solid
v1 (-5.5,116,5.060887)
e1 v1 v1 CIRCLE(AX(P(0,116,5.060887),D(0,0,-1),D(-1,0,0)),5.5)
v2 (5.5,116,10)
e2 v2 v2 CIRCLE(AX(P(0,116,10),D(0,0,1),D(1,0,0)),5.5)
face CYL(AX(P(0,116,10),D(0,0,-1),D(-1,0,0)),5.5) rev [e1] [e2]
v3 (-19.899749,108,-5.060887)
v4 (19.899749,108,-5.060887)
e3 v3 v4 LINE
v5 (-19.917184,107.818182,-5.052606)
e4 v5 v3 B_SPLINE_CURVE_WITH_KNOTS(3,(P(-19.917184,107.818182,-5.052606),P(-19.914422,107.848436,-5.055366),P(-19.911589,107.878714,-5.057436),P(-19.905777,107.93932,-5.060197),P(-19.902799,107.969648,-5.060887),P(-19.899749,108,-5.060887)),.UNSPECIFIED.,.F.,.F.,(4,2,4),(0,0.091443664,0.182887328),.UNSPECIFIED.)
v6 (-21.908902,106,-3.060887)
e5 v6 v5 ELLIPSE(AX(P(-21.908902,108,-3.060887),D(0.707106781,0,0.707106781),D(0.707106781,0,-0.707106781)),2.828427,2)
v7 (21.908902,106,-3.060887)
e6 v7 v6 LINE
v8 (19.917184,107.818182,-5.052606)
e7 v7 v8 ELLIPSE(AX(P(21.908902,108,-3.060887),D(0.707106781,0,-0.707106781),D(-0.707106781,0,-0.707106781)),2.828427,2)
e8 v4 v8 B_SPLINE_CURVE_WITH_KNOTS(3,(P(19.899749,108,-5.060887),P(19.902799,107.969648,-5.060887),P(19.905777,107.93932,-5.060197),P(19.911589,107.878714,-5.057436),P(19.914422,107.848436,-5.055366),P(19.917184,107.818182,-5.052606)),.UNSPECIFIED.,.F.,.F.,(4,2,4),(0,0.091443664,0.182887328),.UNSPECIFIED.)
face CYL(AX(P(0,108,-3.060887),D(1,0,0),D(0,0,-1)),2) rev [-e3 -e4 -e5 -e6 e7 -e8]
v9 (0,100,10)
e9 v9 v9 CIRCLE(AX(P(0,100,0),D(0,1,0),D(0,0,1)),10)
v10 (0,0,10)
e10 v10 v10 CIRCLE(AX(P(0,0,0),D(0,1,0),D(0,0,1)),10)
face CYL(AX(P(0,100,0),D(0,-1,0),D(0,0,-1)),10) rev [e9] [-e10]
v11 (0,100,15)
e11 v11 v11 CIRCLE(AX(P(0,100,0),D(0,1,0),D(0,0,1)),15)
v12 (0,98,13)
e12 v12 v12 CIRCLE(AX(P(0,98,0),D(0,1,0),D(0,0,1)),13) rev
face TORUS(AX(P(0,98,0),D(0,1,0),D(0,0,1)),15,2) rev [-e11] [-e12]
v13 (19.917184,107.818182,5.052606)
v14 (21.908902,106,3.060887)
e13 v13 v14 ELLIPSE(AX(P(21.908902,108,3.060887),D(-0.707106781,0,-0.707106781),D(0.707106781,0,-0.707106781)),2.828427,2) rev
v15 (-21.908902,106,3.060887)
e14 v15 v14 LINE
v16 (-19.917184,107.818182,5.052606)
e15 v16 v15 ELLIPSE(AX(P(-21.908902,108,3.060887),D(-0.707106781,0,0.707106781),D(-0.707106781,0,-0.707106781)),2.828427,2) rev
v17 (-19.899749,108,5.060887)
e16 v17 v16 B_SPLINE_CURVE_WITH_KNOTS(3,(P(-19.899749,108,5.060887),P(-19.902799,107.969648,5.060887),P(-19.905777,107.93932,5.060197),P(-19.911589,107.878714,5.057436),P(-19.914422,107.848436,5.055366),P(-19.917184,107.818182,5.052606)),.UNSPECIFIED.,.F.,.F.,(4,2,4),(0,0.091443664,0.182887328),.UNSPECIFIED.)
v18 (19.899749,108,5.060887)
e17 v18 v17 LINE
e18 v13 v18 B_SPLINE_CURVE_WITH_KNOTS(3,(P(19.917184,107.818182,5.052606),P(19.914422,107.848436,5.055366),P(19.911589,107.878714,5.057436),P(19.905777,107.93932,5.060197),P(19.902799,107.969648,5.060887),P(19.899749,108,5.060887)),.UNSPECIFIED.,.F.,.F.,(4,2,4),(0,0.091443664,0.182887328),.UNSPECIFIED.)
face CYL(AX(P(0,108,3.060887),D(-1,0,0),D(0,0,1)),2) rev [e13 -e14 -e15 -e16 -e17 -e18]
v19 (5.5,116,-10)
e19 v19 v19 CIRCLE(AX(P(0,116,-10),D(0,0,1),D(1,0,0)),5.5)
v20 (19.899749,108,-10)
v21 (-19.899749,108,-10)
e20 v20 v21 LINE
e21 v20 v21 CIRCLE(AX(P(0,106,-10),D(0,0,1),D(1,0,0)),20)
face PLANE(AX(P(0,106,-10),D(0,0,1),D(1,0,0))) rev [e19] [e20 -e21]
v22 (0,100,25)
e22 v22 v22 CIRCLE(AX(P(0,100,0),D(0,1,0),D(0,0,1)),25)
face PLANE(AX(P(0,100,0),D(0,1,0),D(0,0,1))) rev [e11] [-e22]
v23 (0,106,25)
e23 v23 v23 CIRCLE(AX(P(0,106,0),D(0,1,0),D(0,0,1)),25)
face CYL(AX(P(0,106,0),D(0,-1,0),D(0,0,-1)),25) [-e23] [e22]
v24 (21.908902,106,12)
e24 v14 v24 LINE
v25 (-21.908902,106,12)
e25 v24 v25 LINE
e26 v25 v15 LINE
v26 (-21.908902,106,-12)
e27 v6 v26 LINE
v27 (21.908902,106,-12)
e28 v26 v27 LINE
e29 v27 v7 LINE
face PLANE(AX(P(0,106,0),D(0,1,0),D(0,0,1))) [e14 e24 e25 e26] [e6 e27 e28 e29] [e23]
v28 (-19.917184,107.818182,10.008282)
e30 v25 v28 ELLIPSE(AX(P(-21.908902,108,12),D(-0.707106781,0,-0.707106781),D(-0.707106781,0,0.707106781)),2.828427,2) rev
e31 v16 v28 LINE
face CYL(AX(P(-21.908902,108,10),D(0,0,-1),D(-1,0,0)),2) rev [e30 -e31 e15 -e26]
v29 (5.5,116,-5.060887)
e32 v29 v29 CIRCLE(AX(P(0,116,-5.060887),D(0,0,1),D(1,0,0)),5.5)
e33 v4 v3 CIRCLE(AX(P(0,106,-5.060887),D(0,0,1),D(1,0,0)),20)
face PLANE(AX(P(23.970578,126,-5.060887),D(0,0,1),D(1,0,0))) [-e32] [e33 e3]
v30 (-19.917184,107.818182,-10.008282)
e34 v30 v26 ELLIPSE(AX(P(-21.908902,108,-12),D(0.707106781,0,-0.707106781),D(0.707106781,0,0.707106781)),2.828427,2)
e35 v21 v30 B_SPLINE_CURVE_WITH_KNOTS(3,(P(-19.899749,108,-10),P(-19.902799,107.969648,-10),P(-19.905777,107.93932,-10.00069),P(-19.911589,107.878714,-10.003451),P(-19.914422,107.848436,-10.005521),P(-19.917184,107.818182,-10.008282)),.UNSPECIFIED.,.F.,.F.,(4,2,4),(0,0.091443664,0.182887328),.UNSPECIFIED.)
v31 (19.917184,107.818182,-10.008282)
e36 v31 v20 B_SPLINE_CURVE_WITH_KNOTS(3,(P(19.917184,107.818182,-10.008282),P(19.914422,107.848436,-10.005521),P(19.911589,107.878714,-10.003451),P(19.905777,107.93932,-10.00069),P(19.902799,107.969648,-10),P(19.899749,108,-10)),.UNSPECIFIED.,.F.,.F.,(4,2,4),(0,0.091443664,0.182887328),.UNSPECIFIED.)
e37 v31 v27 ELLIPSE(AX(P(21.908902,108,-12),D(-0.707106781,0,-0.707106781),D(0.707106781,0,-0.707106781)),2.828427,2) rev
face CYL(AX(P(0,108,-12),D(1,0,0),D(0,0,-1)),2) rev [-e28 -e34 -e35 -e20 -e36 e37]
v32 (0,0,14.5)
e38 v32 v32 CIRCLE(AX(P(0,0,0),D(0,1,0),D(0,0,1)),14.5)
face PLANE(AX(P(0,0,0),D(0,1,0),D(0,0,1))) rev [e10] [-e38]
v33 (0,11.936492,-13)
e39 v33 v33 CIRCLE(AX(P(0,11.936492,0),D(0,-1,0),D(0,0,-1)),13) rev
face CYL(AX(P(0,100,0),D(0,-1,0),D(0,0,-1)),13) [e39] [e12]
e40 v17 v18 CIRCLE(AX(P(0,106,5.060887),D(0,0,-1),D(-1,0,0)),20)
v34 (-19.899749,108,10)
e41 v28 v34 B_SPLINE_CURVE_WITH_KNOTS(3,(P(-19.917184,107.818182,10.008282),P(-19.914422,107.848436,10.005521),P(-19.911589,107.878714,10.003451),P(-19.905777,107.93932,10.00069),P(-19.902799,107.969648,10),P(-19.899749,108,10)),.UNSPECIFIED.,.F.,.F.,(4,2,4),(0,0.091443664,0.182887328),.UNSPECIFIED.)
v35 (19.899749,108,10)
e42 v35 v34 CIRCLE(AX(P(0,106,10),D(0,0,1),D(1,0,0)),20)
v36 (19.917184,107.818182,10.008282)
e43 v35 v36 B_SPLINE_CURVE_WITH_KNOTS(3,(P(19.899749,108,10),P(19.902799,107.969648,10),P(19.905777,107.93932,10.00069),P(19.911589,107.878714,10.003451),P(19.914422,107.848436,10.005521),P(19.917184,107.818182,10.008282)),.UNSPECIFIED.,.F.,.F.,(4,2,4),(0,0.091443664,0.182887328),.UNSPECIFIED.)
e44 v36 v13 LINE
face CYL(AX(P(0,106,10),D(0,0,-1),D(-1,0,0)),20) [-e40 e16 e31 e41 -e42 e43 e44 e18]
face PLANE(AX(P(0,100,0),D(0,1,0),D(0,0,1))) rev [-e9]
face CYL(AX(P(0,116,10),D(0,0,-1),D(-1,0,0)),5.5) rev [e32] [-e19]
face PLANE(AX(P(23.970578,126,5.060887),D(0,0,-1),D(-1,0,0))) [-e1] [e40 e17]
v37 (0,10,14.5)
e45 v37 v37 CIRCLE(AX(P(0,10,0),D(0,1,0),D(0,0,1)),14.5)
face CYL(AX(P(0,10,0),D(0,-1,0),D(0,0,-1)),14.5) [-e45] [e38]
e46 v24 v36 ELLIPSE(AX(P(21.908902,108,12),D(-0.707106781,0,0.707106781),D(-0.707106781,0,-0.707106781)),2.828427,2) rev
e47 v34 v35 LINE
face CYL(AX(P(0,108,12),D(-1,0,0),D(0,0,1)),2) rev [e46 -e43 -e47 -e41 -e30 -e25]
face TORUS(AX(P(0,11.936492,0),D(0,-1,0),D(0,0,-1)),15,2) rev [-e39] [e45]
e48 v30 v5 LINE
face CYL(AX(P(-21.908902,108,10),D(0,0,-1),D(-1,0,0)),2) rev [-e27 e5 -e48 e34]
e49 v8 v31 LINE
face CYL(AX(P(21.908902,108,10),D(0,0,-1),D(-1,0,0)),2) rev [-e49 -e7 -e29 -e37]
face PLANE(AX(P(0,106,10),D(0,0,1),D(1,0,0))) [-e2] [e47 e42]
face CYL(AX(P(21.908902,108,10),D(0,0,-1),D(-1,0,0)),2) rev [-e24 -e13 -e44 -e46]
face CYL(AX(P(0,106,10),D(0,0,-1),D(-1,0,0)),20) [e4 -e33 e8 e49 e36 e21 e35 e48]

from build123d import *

# Parameters (mm, degrees)
SKETCH2_R            = 13
SKETCH2_R_2          = 10
BOSS_EXTRUDE3_DEPTH  = 100
SKETCH2_3_R          = 14.5
SKETCH2_3_R_2        = 13
BOSS_EXTRUDE5_DEPTH  = 10
SKETCH8_R            = 25
BOSS_EXTRUDE7_DEPTH  = 6
SKETCH11_R           = 5.5
BOSS_EXTRUDE12_DEPTH = 10
SKETCH14_W           = 47.941155358
SKETCH14_H           = 10.12177459
CUT_EXTRUDE2_DEPTH   = 112.740771431
FILLET1_START        = -12.0000001
FILLET1_2_DEPTH      = 2.0000001
FILLET1_START_2      = 3.060887195
FILLET1_3_DEPTH      = 2.0000001
FILLET1_START_3      = -5.060887295
FILLET1_4_DEPTH      = 2
FILLET1_START_4      = 10
FILLET1_5_DEPTH      = 2
FILLET1_START_5      = -10
FILLET1_6_DEPTH      = 4.939112705
FILLET1_START_6      = 5.060887295
FILLET1_7_DEPTH      = 4.939112705
FILLET1_START_7      = -21.9089024
FILLET1_8_DEPTH      = 43.8178047


with BuildPart() as part:
    # Sketch2 → Boss-Extrude3 (new body)
    with BuildSketch(Plane(origin=(0, 0, 0), x_dir=(1, 0, 0), z_dir=(0, 1, 0))):
        with Locations(Location((0, 0, 0), (0, 0, 270))):
            Circle(SKETCH2_R)
        with Locations(Location((0, 0, 0), (0, 0, 270))):
            Circle(SKETCH2_R_2, mode=Mode.SUBTRACT)
    extrude(amount=BOSS_EXTRUDE3_DEPTH)

    # Sketch2<3> → Boss-Extrude5 (add)
    with BuildSketch(Plane(origin=(0, 0, 0), x_dir=(1, 0, 0), z_dir=(0, 1, 0))):
        with Locations(Location((0, 0, 0), (0, 0, 270))):
            Circle(SKETCH2_3_R)
        with Locations(Location((0, 0, 0), (0, 0, 270))):
            Circle(SKETCH2_3_R_2, mode=Mode.SUBTRACT)
    extrude(amount=BOSS_EXTRUDE5_DEPTH)

    # Sketch8 → Boss-Extrude7 (add)
    with BuildSketch(Plane(origin=(0, 100, 0), x_dir=(1, 0, 0), z_dir=(0, 1, 0))):
        with Locations(Location((0, 0, 0), (0, 0, 270))):
            Circle(SKETCH8_R)
    extrude(amount=BOSS_EXTRUDE7_DEPTH)

    # Sketch11 → Boss-Extrude12 (add, symmetric)
    with BuildSketch(Plane.XY):
        with BuildLine():
            Line((20, 106), (-20, 106))
            ThreePointArc((-20, 106), (0, 126), (20, 106))
        make_face()
        with Locations((0, 116)):
            Circle(SKETCH11_R, mode=Mode.SUBTRACT)
    extrude(amount=BOSS_EXTRUDE12_DEPTH, both=True)

    # Sketch14 → Cut-Extrude2 (cut, through all)
    with BuildSketch(Plane(origin=(0, 106, 0), x_dir=(1, 0, 0), z_dir=(0, 1, 0))):
        Rectangle(SKETCH14_W, SKETCH14_H)
    extrude(amount=CUT_EXTRUDE2_DEPTH, mode=Mode.SUBTRACT)

    # Fillet1: read off the stored shape, not the designer's step
    # Fillet1 outline → Fillet1 (revolve)
    with BuildSketch(Plane.XY):
        with BuildLine():
            Line((15, 100), (13, 100))
            Line((13, 100), (13, 98))
            ThreePointArc((13, 98), (13.585786438, 99.414213562), (15, 100))
        make_face()
        with BuildLine():
            ThreePointArc((14.5, 10), (13.41886117, 10.711746802), (13, 11.936491673))
            Line((13, 11.936491673), (13, 10))
            Line((13, 10), (14.5, 10))
        make_face()
    revolve(axis=Axis((0, 0, 0), (0, 1, 0)))

    # Fillet1 2 outline → Fillet1 2 (add)
    with BuildSketch(Plane.XY.offset(FILLET1_START)):
        with BuildLine():
            ThreePointArc((21.9089023, 106), (20.560502575, 106.522902108), (19.917183909, 107.818181818))
            ThreePointArc((19.917183909, 107.818181818), (0, 126), (-19.917183909, 107.818181818))
            ThreePointArc((-19.917183909, 107.818181818), (-20.560502575, 106.522902108), (-21.9089023, 106))
            Line((-21.9089023, 106), (21.9089023, 106))
        make_face()
    extrude(amount=FILLET1_2_DEPTH)

    # Fillet1 3 outline → Fillet1 3 (add)
    with BuildSketch(Plane.XY.offset(FILLET1_START_2)):
        with BuildLine():
            ThreePointArc((21.9089023, 106), (20.560502575, 106.522902108), (19.917183909, 107.818181818))
            ThreePointArc((19.917183909, 107.818181818), (0, 126), (-19.917183909, 107.818181818))
            ThreePointArc((-19.917183909, 107.818181818), (-20.560502575, 106.522902108), (-21.9089023, 106))
            Line((-21.9089023, 106), (21.9089023, 106))
        make_face()
    extrude(amount=FILLET1_3_DEPTH)

    # Fillet1 4 outline → Fillet1 4 (add)
    with BuildSketch(Plane.XY.offset(FILLET1_START_3)):
        with BuildLine():
            ThreePointArc((21.9089023, 106), (20.560502575, 106.522902108), (19.917183909, 107.818181818))
            ThreePointArc((19.917183909, 107.818181818), (0, 126), (-19.917183909, 107.818181818))
            ThreePointArc((-19.917183909, 107.818181818), (-20.560502575, 106.522902108), (-21.9089023, 106))
            Line((-21.9089023, 106), (21.9089023, 106))
        make_face()
    extrude(amount=FILLET1_4_DEPTH)

    # Fillet1 5 outline → Fillet1 5 (add)
    with BuildSketch(Plane.XY.offset(FILLET1_START_4)):
        with BuildLine():
            ThreePointArc((21.9089023, 106), (20.560502575, 106.522902108), (19.917183909, 107.818181818))
            ThreePointArc((19.917183909, 107.818181818), (0, 126), (-19.917183909, 107.818181818))
            ThreePointArc((-19.917183909, 107.818181818), (-20.560502575, 106.522902108), (-21.9089023, 106))
            Line((-21.9089023, 106), (21.9089023, 106))
        make_face()
    extrude(amount=FILLET1_5_DEPTH)

    # Fillet1 6 outline → Fillet1 6 (add)
    with BuildSketch(Plane.XY.offset(FILLET1_START_5)):
        with BuildLine():
            Line((20, 106), (21.9089023, 106))
            ThreePointArc((21.9089023, 106), (20.560502575, 106.522902108), (19.917183909, 107.818181818))
            ThreePointArc((19.917183909, 107.818181818), (19.97928525, 106.910033465), (20, 106))
        make_face()
        with BuildLine():
            ThreePointArc((-20, 106), (-19.97928525, 106.910033465), (-19.917183909, 107.818181818))
            ThreePointArc((-19.917183909, 107.818181818), (-20.560502575, 106.522902108), (-21.9089023, 106))
            Line((-21.9089023, 106), (-20, 106))
        make_face()
    extrude(amount=FILLET1_6_DEPTH)

    # Fillet1 7 outline → Fillet1 7 (add)
    with BuildSketch(Plane.XY.offset(FILLET1_START_6)):
        with BuildLine():
            Line((20, 106), (21.9089023, 106))
            ThreePointArc((21.9089023, 106), (20.560502575, 106.522902108), (19.917183909, 107.818181818))
            ThreePointArc((19.917183909, 107.818181818), (19.97928525, 106.910033465), (20, 106))
        make_face()
        with BuildLine():
            ThreePointArc((-20, 106), (-19.97928525, 106.910033465), (-19.917183909, 107.818181818))
            ThreePointArc((-19.917183909, 107.818181818), (-20.560502575, 106.522902108), (-21.9089023, 106))
            Line((-21.9089023, 106), (-20, 106))
        make_face()
    extrude(amount=FILLET1_7_DEPTH)

    # Fillet1 8 outline → Fillet1 8 (cut)
    with BuildSketch(Plane.YZ.offset(FILLET1_START_7)):
        with BuildLine():
            Line((108, 10), (127, 10))
            Line((127, 10), (127, 12))
            Line((127, 12), (106, 12))
            ThreePointArc((106, 12), (106.585786438, 10.585786438), (108, 10))
        make_face()
        with BuildLine():
            Line((127, 3.060887195), (127, 5.060887295))
            Line((127, 5.060887295), (108, 5.060887295))
            ThreePointArc((108, 5.060887295), (106.585786438, 4.475100858), (106, 3.060887295))
            Line((106, 3.060887295), (127, 3.060887195))
        make_face()
        with BuildLine():
            Line((127, -5.060887295), (127, -3.060887295))
            Line((127, -3.060887295), (106, -3.060887295))
            ThreePointArc((106, -3.060887295), (106.585786438, -4.475100858), (108, -5.060887295))
            Line((108, -5.060887295), (127, -5.060887295))
        make_face()
        with BuildLine():
            Line((127, -12.0000001), (127, -10))
            Line((127, -10), (108, -10))
            ThreePointArc((108, -10), (106.585786438, -10.585786438), (106, -12))
            Line((106, -12), (127, -12.0000001))
        make_face()
    extrude(amount=FILLET1_8_DEPTH, mode=Mode.SUBTRACT)


solid = part.part
